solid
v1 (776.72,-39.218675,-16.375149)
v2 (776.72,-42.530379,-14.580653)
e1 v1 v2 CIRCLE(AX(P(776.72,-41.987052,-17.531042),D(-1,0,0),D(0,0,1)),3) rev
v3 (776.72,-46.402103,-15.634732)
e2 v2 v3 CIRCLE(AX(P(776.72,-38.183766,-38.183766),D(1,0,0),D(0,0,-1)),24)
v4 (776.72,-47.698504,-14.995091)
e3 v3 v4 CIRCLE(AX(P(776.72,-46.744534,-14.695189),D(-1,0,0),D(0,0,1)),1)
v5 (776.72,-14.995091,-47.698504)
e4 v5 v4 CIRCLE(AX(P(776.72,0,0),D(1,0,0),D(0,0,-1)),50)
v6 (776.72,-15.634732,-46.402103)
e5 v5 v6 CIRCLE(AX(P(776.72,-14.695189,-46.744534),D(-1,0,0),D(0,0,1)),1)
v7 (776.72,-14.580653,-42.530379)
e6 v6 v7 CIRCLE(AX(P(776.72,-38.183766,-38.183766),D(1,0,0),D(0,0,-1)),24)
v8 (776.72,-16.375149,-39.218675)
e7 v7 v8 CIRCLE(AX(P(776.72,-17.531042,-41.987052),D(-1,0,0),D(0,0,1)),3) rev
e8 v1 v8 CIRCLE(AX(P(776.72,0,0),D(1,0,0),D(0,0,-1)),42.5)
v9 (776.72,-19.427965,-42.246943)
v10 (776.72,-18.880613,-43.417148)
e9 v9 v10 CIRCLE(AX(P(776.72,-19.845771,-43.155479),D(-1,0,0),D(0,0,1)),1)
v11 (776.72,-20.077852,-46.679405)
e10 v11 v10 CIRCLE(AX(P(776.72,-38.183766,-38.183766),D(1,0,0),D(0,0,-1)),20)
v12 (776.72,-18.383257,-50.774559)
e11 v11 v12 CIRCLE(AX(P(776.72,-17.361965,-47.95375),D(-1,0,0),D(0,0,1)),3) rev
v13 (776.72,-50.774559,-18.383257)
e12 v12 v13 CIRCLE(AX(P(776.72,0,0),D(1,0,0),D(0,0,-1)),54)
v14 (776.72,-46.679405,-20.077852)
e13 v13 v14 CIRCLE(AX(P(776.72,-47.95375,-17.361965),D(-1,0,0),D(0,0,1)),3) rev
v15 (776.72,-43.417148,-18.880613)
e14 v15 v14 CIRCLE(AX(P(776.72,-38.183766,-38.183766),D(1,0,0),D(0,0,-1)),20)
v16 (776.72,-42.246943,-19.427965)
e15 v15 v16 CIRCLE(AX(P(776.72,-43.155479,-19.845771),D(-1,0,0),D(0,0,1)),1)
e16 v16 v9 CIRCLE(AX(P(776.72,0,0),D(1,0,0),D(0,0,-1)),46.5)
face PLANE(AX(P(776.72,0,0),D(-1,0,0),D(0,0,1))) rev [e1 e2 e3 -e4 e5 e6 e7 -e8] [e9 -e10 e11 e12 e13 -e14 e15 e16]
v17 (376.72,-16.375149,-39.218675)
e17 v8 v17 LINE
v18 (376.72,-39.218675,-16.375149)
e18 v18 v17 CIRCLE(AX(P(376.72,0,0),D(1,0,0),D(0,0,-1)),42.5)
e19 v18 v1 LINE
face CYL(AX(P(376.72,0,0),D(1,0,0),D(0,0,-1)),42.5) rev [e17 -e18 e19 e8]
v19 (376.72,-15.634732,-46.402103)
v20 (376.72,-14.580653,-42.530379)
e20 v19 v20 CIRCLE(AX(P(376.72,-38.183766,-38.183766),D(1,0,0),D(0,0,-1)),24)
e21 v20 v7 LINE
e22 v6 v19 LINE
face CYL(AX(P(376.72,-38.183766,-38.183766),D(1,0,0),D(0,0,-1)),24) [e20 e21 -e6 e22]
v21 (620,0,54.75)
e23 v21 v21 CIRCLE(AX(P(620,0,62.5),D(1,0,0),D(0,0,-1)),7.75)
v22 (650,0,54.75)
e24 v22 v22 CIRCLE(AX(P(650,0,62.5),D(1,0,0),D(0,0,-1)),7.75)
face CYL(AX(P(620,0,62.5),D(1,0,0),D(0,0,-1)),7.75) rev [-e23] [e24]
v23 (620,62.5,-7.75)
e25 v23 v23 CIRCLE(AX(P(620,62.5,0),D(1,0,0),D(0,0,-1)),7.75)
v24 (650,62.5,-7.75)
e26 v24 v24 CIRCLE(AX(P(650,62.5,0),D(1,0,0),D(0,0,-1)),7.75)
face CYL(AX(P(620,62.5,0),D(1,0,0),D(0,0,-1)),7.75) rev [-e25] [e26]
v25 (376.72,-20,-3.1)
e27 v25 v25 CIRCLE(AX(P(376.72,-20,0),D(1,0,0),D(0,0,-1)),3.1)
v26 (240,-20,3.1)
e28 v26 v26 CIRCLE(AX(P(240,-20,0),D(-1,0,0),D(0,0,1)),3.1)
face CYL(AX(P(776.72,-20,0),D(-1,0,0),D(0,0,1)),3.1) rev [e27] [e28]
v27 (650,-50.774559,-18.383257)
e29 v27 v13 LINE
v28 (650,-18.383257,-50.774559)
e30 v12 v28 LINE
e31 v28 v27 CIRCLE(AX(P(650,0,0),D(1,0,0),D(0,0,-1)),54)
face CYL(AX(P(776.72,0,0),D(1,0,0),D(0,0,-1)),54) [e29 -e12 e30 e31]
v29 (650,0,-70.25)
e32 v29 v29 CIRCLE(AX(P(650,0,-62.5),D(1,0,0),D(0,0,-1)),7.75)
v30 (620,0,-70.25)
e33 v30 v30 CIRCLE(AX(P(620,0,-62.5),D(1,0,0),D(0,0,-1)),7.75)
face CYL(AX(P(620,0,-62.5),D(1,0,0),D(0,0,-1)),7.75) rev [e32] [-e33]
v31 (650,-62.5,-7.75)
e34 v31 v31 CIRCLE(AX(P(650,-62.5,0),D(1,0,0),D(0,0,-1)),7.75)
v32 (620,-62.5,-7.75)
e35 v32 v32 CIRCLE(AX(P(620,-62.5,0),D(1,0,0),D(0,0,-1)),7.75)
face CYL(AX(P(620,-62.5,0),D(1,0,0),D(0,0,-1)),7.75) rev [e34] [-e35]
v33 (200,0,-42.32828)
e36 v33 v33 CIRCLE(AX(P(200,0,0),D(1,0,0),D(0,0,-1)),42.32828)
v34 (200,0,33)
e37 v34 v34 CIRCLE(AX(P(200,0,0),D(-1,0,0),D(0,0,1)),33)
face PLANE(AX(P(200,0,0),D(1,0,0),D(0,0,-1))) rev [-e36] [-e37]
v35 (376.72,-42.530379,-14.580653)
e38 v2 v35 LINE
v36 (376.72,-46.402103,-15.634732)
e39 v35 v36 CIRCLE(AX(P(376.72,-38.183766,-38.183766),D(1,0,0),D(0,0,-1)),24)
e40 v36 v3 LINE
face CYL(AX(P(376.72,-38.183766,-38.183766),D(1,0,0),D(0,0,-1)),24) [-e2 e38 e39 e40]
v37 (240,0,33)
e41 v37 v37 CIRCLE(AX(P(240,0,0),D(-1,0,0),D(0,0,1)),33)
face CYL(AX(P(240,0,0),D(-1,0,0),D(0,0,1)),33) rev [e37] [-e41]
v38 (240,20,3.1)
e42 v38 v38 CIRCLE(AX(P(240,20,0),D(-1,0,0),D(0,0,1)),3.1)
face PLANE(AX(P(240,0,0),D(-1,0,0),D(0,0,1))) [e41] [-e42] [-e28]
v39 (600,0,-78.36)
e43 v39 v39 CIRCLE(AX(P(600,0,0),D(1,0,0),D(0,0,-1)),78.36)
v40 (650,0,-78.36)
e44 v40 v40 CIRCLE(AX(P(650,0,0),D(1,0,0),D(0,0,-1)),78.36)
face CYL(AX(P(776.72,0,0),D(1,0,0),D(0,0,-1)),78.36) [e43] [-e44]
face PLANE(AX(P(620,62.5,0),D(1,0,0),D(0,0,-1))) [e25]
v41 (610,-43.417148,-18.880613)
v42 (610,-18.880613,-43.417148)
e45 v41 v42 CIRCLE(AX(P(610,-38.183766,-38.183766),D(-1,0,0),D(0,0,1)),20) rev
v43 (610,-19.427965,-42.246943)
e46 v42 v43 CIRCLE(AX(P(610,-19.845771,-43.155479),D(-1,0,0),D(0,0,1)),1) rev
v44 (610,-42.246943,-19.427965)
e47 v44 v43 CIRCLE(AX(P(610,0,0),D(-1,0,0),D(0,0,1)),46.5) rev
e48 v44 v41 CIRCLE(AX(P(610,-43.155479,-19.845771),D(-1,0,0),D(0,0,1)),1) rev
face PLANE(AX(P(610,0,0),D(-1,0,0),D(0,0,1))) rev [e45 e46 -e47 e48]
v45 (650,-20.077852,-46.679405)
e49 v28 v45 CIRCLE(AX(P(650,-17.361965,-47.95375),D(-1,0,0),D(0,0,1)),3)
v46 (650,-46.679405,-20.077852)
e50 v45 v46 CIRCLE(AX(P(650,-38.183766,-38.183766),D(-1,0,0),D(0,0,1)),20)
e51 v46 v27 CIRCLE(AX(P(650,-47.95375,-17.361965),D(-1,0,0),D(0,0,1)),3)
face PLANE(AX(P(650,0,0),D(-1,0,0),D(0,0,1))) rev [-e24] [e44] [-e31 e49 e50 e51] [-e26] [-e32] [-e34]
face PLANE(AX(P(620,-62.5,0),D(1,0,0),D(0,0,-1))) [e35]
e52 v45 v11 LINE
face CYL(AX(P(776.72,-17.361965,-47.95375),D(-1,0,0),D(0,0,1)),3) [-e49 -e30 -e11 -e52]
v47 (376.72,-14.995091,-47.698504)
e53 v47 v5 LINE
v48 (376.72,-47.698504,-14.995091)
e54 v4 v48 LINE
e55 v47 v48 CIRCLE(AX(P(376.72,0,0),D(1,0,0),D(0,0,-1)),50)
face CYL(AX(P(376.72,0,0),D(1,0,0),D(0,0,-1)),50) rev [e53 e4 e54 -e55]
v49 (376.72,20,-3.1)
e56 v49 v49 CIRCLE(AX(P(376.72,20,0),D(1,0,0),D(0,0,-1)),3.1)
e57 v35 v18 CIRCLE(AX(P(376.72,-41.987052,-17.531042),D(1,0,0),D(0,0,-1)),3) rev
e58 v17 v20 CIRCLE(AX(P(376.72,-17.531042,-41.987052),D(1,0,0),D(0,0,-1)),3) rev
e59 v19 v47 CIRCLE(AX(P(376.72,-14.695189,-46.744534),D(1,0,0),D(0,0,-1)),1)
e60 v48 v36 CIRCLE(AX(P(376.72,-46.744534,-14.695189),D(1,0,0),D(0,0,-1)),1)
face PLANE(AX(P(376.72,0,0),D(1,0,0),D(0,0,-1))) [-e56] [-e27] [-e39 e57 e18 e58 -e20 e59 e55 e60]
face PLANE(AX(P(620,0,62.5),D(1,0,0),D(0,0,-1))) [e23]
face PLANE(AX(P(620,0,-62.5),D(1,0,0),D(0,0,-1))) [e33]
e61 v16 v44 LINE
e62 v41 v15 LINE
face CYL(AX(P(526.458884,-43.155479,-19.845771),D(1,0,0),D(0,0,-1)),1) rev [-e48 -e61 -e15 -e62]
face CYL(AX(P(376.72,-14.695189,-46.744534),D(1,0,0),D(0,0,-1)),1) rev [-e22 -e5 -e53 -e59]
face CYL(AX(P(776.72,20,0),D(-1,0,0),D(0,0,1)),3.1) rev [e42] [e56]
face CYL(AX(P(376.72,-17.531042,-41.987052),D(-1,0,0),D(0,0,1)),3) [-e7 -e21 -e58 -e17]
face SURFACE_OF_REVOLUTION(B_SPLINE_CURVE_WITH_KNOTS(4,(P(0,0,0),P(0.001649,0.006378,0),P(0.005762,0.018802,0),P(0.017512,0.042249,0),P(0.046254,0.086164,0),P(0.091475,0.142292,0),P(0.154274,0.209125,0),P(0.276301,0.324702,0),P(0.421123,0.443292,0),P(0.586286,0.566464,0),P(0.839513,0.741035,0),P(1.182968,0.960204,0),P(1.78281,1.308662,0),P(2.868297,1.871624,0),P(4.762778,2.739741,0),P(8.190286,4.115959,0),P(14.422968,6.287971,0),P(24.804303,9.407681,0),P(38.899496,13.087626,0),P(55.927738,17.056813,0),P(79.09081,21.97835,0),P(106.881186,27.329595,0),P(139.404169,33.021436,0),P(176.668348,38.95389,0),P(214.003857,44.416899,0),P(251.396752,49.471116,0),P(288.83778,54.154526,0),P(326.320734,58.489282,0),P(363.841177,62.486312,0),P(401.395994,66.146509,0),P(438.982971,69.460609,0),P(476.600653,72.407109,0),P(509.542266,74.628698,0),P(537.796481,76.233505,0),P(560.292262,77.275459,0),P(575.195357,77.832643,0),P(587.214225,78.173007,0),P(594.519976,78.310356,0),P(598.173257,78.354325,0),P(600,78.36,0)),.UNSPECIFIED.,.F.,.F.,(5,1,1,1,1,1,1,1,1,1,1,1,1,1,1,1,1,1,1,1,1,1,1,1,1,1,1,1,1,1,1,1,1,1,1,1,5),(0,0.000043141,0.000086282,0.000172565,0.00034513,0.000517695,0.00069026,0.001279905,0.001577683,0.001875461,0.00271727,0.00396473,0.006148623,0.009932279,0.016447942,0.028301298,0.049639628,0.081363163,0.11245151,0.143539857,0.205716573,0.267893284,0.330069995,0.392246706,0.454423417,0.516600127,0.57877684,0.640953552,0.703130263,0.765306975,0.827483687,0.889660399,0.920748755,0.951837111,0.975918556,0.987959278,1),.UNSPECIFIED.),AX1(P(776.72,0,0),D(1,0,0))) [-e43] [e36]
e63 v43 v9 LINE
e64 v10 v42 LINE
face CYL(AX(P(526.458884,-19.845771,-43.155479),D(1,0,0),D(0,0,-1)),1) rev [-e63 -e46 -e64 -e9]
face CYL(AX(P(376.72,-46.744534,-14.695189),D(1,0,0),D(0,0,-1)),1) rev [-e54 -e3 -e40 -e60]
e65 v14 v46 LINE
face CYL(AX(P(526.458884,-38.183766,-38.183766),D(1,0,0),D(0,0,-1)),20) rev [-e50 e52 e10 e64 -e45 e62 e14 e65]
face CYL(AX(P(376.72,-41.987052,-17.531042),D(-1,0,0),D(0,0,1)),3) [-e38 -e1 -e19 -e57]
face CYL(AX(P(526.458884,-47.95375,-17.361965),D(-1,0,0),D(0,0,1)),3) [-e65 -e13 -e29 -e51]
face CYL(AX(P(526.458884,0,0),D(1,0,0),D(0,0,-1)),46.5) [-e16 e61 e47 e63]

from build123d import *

# Parameters (mm, degrees)
CUT_EXTRUDE1_DEPTH = 400
SKETCH3_R          = 33
SKETCH3_R_2        = 3.1000000000000028
CUT_EXTRUDE2_DEPTH = 40
SKETCH3_2_R        = 3.1000000000000028
CUT_EXTRUDE4_DEPTH = 588.2704126987336
SKETCH4_R          = 7.750000000000002
SKETCH4_R_2        = 7.749999999999998
SKETCH4_R_3        = 7.75
CUT_EXTRUDE5_DEPTH = 30
CUT_EXTRUDE6_START = -166.72
CUT_EXTRUDE6_DEPTH = 166.72
CUT_EXTRUDE7_START = -166.72
CUT_EXTRUDE7_DEPTH = 40
FILLET1_R          = 3
FILLET2_R          = 1


# Read off the part's stored shape, not the designer's step: Cut-Extrude7
with BuildPart() as part:
    # Sketch1 → Revolve1 (revolve)
    with BuildSketch(Plane.XY, mode=Mode.PRIVATE) as revolve1_sk:
        with BuildLine():
            Line((650.0000000000001, 78.36), (600.0000000000001, 78.35999999999999))
            add(Edge.make_bspline(
                [(200.00000000000358, 42.32828037010144), (208.17052038042252, 43.51395402277683), (225.68488706430128, 45.99527814756255), (252.5646252490451, 49.61720291886234), (288.8377795121088, 54.154525537406215), (326.32073414086074, 58.489281573967666), (363.84117713275197, 62.4863121261995), (401.3959942076804, 66.1465092198773), (438.98297125108434, 69.46060873551288), (476.60065297069735, 72.40710938265987), (509.54226569024473, 74.62869781075653), (537.7964811389767, 76.23350465282824), (560.2922621801154, 77.27545940077594), (575.1953567037801, 77.83264328043563), (587.2142250450652, 78.17300672656529), (594.5199761893905, 78.31035588184413), (598.173256760109, 78.35432466011183), (600.0000000000001, 78.35999999999999)],
                knots=[0.33782774337518406, 0.33782774337518406, 0.33782774337518406, 0.33782774337518406, 0.33782774337518406, 0.3922467059008778, 0.45442341660838875, 0.5166001272068571, 0.5787768404127641, 0.6409535517353824, 0.7031302632972144, 0.7653069754242735, 0.8274836869805778, 0.8896603985814769, 0.9207487548355946, 0.9518371110897123, 0.9759185555448562, 0.9879592777724281, 1, 1, 1, 1, 1], degree=4))
            Line((200.0000000000036, 42.32828037010143), (200, -7.43e-14))
            Line((200, 0), (776.72, 0))
            Line((776.72, 0), (776.72, 54))
            Line((776.72, 54), (650.0000000000001, 54))
            Line((650.0000000000001, 54), (650.0000000000001, 78.36))
        make_face()
    revolve(revolve1_sk.sketch.rotate(Axis((776.72, 0, 0), (-1, 0, 0)), 90), axis=Axis((776.72, 0, 0), (-1, 0, 0)))

    # Sketch2 → Cut-Extrude1 (cut)
    with BuildSketch(Plane(origin=(776.72, 0, 0), x_dir=(0, 0, -1), z_dir=(1, 0, 0))):
        with BuildLine():
            ThreePointArc((47.36738574096539, -16.010333165383813), (-35.35533905932756, 35.35533905932719), (16.01033316538431, -47.367385740965226))
            ThreePointArc((16.010333165384957, -47.36738574096489), (14.843408327061695, -43.77194076139418), (14.25549204864172, -40.03786890496388))
            ThreePointArc((14.25549204864269, -40.03786890496403), (30.05203820042843, -30.05203820042811), (40.037868904964185, -14.255492048642266))
            ThreePointArc((40.03786890496402, -14.255492048641287), (43.77194076139434, -14.843408327061226), (47.36738574096508, -16.01033316538445))
        make_face()
    extrude(amount=-CUT_EXTRUDE1_DEPTH, mode=Mode.SUBTRACT)

    # Sketch3 → Cut-Extrude2 (cut)
    with BuildSketch(Plane.ZY.offset(-200.00000000000273)):
        Circle(SKETCH3_R)
        with Locations((0, 20)):
            Circle(SKETCH3_R_2, mode=Mode.SUBTRACT)
        with Locations((0, -20)):
            Circle(SKETCH3_R_2, mode=Mode.SUBTRACT)
    extrude(amount=-CUT_EXTRUDE2_DEPTH, mode=Mode.SUBTRACT)

    # Sketch3<2> → Cut-Extrude4 (cut, through all)
    with BuildSketch(Plane.ZY.offset(-200.00000000000273)):
        with Locations((0, 20)):
            Circle(SKETCH3_2_R)
        with Locations((0, -20)):
            Circle(SKETCH3_2_R)
    extrude(amount=-CUT_EXTRUDE4_DEPTH, mode=Mode.SUBTRACT)

    # Sketch4 → Cut-Extrude5 (cut)
    with BuildSketch(Plane(origin=(650.0000000000001, 0, 0), x_dir=(0, 0, -1), z_dir=(1, 0, 0))):
        with Locations((0, 62.5)):
            Circle(SKETCH4_R)
        with Locations((62.499999999999986, -2.1825e-13)):
            Circle(SKETCH4_R_2)
        with Locations((-4.3715e-13, -62.5)):
            Circle(SKETCH4_R_3)
        with Locations((-62.49999999999999, 6.5573e-13)):
            Circle(SKETCH4_R_2)
    extrude(amount=-CUT_EXTRUDE5_DEPTH, mode=Mode.SUBTRACT)

    # Sketch2<3> → Cut-Extrude6 (cut)
    with BuildSketch(Plane(origin=(776.72, 0, 0), x_dir=(0, 0, -1), z_dir=(1, 0, 0)).offset(CUT_EXTRUDE6_START)):
        with BuildLine():
            ThreePointArc((18.674162122276517, -42.585510083018875), (19.845504593214095, -46.16550545726443), (21.667324002424465, -49.462380356933224))
            ThreePointArc((21.66732400242451, -49.46238035693348), (38.18376618407376, -38.18376618407337), (49.4623803569337, -21.667324002424003))
            ThreePointArc((49.46238035693346, -21.667324002423932), (46.16550545726464, -19.845504593213597), (42.58551008301907, -18.67416212227606))
            ThreePointArc((42.58551008301935, -18.674162122276265), (32.880465325174626, -32.88046532517429), (18.674162122276698, -42.58551008301916))
        make_face()
    extrude(amount=CUT_EXTRUDE6_DEPTH, mode=Mode.SUBTRACT)

    # Cut-Extrude7 outline → Cut-Extrude7 (cut)
    with BuildSketch(Plane(origin=(776.72, 0, 0), x_dir=(0, 0, -1), z_dir=(1, 0, 0)).offset(CUT_EXTRUDE7_START)):
        with BuildLine():
            ThreePointArc((49.462380357, -21.667324002), (38.183766184, -38.183766184), (21.667324002, -49.462380357))
            ThreePointArc((21.667324002, -49.462380357), (52.325901808, -52.325901808), (49.462380357, -21.667324002))
        make_face()
    extrude(amount=CUT_EXTRUDE7_DEPTH, mode=Mode.SUBTRACT)

    # Fillet1
    # the kernel refuses this fillet: 3 mm, written as the material it takes off along each edge
    with BuildSketch(Plane(origin=(783.0040750376627, -40.03786890496436, -14.255492048641756), x_dir=(0, 0.36048933664361255, -0.9327633344885766), z_dir=(-1, 0, 0))) as fillet1_piece_1:
        with BuildLine():
            CenterArc((2.3526530908588352, 2.998927692547355), FILLET1_R, 190.6958961912189, 77.77213613267259)
            ThreePointArc((-0.5952251863106816, 2.4421389866704493), (-0.3296065941102598, 1.2132715607510574), (0, 0))
            ThreePointArc((0, 0), (1.1362245041079626, 0.01519102224578455), (2.2724490082159248, 3e-17))
        make_face()
    extrude(amount=406.28407503766266, mode=Mode.SUBTRACT)
    with BuildSketch(Plane(origin=(783.0040750376628, -14.255492048641326, -40.03786890496452), x_dir=(0, -0.12935906708338796, -0.9915978175466682), z_dir=(-1, 0, 0))) as fillet1_piece_2:
        with BuildLine():
            CenterArc((2.356528139123201, 2.995883676075499), FILLET1_R, 195.22966173823434, 77.77213613267247)
            ThreePointArc((-0.5381137542877349, 2.207817492997983), (-0.25429790806270375, 1.1075059660548925), (0, 0))
            ThreePointArc((0, 0), (1.2568150075323716, -0.0329305913960081), (2.513630015064742, 0))
        make_face()
    extrude(amount=406.2840750376628, mode=Mode.SUBTRACT)
    with BuildSketch(Plane(origin=(650.0000000000001, -49.46238035693335, -21.667324002424486), x_dir=(0, -0.3710376913926641, 0.9286178070476584), z_dir=(1, 0, 0))) as fillet1_piece_3:
        with BuildLine():
            CenterArc((3.4382745469761065, -2.998391169718282), FILLET1_R, 88.12348720794618, 95.23374468145443)
            ThreePointArc((0.4434230907932443, -3.1740748496643687), (0.2853925875390597, -1.5781410862550613), (0, 0))
            ThreePointArc((0, 0), (1.7682554813020526, 0.0289589450709421), (3.5365109626041082, -1.1e-16))
        make_face()
    extrude(amount=135.56127740651016, mode=Mode.SUBTRACT)
    with BuildSketch(Plane(origin=(650.0000000000001, -21.667324002423964, -49.46238035693357), x_dir=(0, 0.9286178070476617, -0.3710376913926558), z_dir=(1, 0, 0))) as fillet1_piece_4:
        with BuildLine():
            CenterArc((3.438274546976126, 2.998391169718279), FILLET1_R, 176.64276811059946, 95.23374468145443)
            ThreePointArc((0.44342309079326614, 3.174074849664362), (0.28539258753907326, 1.5781410862550511), (0, 0))
            ThreePointArc((0, 0), (1.7682554813020637, -0.02895894507093817), (3.53651096260413, 5e-17))
        make_face()
    extrude(amount=135.56127740651016, mode=Mode.SUBTRACT)

    # Fillet2
    fillet2_edges = [part.edges().sort_by_distance(p)[0] for p in [
        (576.72, -47.36738574096506, -16.010333165384637),
        (576.72, -16.01033316538413, -47.36738574096523),
        (693.36, -18.67416212227616, -42.58551008301921),
        (693.36, -42.58551008301902, -18.674162122276606),
    ]]
    fillet(fillet2_edges, radius=FILLET2_R)


solid = part.part
